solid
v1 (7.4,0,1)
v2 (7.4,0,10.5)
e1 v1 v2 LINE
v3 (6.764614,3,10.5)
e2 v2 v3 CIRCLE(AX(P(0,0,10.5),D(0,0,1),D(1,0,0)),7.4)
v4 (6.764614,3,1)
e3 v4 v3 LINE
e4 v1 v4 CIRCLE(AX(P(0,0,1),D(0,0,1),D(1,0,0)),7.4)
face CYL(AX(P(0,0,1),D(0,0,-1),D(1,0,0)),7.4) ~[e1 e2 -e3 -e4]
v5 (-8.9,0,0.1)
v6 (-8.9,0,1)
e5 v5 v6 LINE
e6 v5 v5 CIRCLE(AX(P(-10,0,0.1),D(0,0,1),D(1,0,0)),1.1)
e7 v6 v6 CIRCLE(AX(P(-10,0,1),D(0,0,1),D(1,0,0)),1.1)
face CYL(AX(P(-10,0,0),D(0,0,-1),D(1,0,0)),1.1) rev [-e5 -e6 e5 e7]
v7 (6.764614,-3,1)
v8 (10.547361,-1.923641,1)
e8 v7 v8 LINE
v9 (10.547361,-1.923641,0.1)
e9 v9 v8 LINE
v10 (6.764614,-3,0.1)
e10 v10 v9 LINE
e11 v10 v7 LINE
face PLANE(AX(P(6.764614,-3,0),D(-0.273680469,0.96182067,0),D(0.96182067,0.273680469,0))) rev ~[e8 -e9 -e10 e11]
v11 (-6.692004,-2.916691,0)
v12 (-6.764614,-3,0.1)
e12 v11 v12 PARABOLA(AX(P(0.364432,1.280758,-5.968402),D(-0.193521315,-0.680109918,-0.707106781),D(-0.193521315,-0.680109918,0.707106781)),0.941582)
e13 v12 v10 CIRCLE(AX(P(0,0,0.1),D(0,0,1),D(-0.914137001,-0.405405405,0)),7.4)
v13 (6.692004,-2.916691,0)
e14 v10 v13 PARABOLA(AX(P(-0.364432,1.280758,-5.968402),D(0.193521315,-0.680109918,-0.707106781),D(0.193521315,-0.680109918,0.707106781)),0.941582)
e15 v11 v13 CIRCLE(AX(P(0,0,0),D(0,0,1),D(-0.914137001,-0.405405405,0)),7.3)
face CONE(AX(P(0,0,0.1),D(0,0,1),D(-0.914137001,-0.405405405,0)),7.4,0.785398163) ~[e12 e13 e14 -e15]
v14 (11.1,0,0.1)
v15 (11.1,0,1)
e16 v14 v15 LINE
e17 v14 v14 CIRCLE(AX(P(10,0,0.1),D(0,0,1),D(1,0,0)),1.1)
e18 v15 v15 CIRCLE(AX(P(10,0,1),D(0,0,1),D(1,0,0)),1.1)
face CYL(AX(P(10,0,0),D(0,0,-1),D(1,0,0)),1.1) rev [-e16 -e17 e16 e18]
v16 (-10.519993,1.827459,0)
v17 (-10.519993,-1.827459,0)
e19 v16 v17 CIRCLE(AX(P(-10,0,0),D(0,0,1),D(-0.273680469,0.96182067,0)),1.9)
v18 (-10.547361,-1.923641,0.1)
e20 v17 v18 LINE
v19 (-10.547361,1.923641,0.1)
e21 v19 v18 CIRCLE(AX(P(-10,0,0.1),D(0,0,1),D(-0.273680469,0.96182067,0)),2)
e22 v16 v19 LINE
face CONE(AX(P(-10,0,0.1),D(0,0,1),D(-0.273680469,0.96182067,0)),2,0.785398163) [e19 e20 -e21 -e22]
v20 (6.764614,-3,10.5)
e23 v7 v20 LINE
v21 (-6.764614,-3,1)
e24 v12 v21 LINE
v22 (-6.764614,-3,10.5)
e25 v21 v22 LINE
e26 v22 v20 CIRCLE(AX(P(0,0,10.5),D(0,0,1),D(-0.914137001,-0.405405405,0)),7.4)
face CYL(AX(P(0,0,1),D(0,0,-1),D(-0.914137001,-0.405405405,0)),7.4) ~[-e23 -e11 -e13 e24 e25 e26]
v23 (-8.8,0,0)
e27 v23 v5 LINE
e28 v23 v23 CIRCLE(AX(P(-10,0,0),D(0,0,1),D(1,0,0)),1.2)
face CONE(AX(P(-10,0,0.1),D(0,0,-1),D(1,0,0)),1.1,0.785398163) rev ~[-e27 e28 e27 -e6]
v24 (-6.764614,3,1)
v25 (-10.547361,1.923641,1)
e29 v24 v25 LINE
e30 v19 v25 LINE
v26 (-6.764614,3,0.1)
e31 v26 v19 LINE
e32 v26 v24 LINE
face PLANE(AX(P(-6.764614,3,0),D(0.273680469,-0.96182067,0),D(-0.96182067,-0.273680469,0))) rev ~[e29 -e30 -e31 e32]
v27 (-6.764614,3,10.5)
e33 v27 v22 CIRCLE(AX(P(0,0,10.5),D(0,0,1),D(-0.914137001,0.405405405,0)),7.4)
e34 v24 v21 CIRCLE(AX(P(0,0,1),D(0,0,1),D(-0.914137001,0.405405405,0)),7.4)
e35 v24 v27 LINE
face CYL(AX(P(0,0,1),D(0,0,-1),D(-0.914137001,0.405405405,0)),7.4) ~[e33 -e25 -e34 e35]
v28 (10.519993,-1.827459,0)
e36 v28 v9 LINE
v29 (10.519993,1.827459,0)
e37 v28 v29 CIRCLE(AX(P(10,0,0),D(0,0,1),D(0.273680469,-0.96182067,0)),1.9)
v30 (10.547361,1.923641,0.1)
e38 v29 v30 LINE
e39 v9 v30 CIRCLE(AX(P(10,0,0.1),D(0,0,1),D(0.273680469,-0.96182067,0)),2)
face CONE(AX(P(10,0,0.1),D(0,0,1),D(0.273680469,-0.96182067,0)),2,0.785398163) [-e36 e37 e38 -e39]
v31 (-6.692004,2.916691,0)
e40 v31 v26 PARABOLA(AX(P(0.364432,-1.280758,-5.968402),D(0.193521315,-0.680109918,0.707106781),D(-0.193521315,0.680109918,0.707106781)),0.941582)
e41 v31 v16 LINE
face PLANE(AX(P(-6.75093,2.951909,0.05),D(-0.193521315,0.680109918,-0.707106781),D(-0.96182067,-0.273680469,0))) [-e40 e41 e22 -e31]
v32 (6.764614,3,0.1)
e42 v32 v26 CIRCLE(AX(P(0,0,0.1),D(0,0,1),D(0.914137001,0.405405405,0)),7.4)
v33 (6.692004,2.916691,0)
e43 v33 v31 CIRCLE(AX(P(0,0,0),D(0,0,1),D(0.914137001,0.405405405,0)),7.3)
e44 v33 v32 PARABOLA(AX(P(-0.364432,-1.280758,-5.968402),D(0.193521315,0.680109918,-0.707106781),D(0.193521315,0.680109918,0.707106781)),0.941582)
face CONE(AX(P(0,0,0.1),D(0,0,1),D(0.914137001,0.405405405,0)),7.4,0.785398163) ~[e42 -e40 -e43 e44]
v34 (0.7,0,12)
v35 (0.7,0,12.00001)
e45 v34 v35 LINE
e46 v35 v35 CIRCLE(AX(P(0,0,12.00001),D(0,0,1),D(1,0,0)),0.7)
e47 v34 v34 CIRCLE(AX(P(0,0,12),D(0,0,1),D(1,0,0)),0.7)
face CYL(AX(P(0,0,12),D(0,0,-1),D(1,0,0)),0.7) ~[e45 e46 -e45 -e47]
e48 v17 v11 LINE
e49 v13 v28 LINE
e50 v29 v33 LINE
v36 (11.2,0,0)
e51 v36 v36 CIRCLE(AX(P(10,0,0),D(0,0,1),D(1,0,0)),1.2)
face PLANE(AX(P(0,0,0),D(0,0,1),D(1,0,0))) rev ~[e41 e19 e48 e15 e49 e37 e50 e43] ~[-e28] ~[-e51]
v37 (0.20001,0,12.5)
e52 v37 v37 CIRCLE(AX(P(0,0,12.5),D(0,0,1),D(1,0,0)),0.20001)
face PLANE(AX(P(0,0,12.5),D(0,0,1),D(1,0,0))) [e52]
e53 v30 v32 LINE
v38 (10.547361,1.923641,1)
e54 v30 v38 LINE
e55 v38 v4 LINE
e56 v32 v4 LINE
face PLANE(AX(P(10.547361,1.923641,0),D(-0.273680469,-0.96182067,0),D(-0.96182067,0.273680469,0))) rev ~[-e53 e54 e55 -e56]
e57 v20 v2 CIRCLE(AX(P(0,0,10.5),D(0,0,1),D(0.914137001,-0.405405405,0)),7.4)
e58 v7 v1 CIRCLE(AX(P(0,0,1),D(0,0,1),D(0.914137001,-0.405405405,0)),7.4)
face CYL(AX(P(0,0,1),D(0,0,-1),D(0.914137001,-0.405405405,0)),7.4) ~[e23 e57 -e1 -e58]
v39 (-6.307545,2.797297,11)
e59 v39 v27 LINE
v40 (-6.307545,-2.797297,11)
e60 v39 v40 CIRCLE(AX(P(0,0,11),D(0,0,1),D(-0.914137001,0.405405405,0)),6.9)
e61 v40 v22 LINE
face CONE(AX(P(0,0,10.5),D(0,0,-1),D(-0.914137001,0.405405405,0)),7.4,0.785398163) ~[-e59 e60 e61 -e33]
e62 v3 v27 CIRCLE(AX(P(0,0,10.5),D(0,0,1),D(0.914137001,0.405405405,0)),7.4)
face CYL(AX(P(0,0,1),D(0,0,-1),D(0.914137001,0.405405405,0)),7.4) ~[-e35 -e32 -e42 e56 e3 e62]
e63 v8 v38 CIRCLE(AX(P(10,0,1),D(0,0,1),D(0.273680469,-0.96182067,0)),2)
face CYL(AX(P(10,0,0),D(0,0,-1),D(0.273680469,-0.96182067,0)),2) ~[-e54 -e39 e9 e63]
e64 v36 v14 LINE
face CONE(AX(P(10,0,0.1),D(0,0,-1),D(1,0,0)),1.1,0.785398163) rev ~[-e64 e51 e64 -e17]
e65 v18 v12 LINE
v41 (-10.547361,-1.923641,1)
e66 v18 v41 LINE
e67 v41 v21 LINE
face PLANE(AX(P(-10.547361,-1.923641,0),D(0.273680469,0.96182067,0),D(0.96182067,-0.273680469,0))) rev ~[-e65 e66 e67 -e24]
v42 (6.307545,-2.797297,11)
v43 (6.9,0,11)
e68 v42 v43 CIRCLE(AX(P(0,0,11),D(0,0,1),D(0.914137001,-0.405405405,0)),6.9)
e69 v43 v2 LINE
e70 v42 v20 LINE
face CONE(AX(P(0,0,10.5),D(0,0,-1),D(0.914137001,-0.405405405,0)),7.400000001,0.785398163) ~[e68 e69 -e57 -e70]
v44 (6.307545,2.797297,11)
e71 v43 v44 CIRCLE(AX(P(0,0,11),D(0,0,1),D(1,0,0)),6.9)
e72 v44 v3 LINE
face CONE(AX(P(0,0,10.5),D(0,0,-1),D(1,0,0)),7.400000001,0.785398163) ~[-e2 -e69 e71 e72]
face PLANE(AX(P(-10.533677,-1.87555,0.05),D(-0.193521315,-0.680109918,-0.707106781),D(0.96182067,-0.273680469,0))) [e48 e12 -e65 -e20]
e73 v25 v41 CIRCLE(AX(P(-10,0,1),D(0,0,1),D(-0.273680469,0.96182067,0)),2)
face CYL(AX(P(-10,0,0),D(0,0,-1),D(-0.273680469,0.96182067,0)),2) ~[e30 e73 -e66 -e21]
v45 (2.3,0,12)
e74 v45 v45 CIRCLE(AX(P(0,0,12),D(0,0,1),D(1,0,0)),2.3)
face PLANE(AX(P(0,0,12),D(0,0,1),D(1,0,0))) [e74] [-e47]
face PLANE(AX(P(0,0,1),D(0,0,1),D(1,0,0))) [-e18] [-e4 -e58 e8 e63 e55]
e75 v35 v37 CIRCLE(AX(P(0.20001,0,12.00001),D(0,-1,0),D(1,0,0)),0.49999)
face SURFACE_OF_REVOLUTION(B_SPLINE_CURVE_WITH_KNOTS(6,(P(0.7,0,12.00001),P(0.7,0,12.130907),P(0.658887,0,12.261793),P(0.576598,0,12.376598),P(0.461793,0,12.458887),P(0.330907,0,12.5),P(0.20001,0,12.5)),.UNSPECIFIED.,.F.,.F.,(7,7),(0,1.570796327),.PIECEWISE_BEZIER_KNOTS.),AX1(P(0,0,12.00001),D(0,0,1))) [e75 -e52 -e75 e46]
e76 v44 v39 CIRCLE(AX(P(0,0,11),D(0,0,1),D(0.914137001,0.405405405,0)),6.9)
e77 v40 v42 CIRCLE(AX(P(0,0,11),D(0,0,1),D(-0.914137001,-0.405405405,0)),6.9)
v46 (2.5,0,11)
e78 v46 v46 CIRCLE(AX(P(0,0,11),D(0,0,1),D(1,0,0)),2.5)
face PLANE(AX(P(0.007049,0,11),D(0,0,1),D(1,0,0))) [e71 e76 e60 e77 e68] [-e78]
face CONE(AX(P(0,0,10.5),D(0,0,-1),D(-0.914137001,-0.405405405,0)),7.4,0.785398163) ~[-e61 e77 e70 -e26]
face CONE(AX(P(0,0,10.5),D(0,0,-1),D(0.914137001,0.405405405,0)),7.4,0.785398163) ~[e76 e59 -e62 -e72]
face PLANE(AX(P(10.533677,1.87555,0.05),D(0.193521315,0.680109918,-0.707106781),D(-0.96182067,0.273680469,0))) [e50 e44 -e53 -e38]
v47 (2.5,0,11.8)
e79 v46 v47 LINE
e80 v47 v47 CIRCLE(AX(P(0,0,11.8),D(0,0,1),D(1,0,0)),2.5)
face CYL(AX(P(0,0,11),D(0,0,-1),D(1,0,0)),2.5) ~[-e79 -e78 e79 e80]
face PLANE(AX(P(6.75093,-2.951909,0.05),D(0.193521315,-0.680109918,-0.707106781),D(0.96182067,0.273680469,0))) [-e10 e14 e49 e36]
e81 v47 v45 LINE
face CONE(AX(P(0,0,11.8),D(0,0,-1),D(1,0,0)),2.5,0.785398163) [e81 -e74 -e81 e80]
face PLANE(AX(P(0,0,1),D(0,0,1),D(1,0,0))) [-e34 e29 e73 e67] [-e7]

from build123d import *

# Parameters (mm, degrees)
F0_R     = 1.1
F1_DEPTH = 1
F3_DEPTH = 10
F4_R     = 2.5
F5_DEPTH = 1
F6_R     = 0.7
F7_DEPTH = 0.5
F8_R     = 0.49999
F9_SIZE  = 0.5
F10_SIZE = 0.1
F11_SIZE = 0.2


# Not quite as in the source:
# - a fillet or chamfer is up to 0.001 mm smaller than in the source, because OpenCascade refuses the exact size


with BuildPart() as f1:
    # F0 (on Top) → F1 (new body)
    with BuildSketch(Plane.XY):
        with BuildLine():
            ThreePointArc((-10.5473609378, 1.9236413397), (-12, 0), (-10.5473609378, -1.9236413397))
            Line((-10.5473609378, -1.9236413397), (-6.7646138101, -3))
            ThreePointArc((-6.7646138101, -3), (0, -7.4), (6.7646138101, -3))
            Line((6.7646138101, -3), (10.5473609378, -1.9236413397))
            ThreePointArc((10.5473609378, -1.9236413397), (12, 0), (10.5473609378, 1.9236413397))
            Line((10.5473609378, 1.9236413397), (6.7646138101, 3))
            ThreePointArc((6.7646138101, 3), (0, 7.4), (-6.7646138101, 3))
            Line((-6.7646138101, 3), (-10.5473609378, 1.9236413397))
        make_face()
        with Locations((-10, 0)):
            Circle(F0_R, mode=Mode.SUBTRACT)
        with Locations((10, 0)):
            Circle(F0_R, mode=Mode.SUBTRACT)
    extrude(amount=F1_DEPTH)

    # F2 (on face) → F3 (join)
    with BuildSketch(Plane.XY.offset(1)):
        with BuildLine():
            ThreePointArc((6.7646138101, -3), (7.2394109634, -1.5332739164), (7.4, 0))
            ThreePointArc((7.4, 0), (7.2394109634, 1.5332739164), (6.7646138101, 3))
            ThreePointArc((6.7646138101, 3), (0, 7.4), (-6.7646138101, 3))
            ThreePointArc((-6.7646138101, 3), (-7.4, 0), (-6.7646138101, -3))
            ThreePointArc((-6.7646138101, -3), (0, -7.4), (6.7646138101, -3))
        make_face()
    extrude(amount=F3_DEPTH)

    # F4 (on face) → F5 (join)
    with BuildSketch(Plane.XY.offset(11)):
        Circle(F4_R)
    extrude(amount=F5_DEPTH)

    # F6 (on face) → F7 (join)
    with BuildSketch(Plane.XY.offset(12)):
        Circle(F6_R)
    extrude(amount=F7_DEPTH)

    # F8 (radius 0.5 in the source; OpenCascade refuses exactly that, so slightly less here)
    f8_edges = [f1.edges().sort_by_distance(p)[0] for p in [
        (-0.7, 0, 12.5),
    ]]
    fillet(f8_edges, radius=F8_R)

    # F9
    f9_edges = [f1.edges().sort_by_distance(p)[0] for p in [
        (-7.4, 0, 11),
    ]]
    chamfer(f9_edges, length=F9_SIZE)

    # F10
    f10_edges = [f1.edges().sort_by_distance(p)[0] for p in [
        (-8.655987, 2.461821, 0),
        (-12, 0, 0),
        (-8.655987, -2.461821, 0),
        (0, -7.4, 0),
        (8.655987, -2.461821, 0),
        (12, 0, 0),
        (8.655987, 2.461821, 0),
        (0, 7.4, 0),
        (-11.1, 0, 0),
        (8.9, 0, 0),
    ]]
    chamfer(f10_edges, length=F10_SIZE)

    # F11
    f11_edges = [f1.edges().sort_by_distance(p)[0] for p in [
        (-2.5, 0, 12),
    ]]
    chamfer(f11_edges, length=F11_SIZE)


solid = f1.part
